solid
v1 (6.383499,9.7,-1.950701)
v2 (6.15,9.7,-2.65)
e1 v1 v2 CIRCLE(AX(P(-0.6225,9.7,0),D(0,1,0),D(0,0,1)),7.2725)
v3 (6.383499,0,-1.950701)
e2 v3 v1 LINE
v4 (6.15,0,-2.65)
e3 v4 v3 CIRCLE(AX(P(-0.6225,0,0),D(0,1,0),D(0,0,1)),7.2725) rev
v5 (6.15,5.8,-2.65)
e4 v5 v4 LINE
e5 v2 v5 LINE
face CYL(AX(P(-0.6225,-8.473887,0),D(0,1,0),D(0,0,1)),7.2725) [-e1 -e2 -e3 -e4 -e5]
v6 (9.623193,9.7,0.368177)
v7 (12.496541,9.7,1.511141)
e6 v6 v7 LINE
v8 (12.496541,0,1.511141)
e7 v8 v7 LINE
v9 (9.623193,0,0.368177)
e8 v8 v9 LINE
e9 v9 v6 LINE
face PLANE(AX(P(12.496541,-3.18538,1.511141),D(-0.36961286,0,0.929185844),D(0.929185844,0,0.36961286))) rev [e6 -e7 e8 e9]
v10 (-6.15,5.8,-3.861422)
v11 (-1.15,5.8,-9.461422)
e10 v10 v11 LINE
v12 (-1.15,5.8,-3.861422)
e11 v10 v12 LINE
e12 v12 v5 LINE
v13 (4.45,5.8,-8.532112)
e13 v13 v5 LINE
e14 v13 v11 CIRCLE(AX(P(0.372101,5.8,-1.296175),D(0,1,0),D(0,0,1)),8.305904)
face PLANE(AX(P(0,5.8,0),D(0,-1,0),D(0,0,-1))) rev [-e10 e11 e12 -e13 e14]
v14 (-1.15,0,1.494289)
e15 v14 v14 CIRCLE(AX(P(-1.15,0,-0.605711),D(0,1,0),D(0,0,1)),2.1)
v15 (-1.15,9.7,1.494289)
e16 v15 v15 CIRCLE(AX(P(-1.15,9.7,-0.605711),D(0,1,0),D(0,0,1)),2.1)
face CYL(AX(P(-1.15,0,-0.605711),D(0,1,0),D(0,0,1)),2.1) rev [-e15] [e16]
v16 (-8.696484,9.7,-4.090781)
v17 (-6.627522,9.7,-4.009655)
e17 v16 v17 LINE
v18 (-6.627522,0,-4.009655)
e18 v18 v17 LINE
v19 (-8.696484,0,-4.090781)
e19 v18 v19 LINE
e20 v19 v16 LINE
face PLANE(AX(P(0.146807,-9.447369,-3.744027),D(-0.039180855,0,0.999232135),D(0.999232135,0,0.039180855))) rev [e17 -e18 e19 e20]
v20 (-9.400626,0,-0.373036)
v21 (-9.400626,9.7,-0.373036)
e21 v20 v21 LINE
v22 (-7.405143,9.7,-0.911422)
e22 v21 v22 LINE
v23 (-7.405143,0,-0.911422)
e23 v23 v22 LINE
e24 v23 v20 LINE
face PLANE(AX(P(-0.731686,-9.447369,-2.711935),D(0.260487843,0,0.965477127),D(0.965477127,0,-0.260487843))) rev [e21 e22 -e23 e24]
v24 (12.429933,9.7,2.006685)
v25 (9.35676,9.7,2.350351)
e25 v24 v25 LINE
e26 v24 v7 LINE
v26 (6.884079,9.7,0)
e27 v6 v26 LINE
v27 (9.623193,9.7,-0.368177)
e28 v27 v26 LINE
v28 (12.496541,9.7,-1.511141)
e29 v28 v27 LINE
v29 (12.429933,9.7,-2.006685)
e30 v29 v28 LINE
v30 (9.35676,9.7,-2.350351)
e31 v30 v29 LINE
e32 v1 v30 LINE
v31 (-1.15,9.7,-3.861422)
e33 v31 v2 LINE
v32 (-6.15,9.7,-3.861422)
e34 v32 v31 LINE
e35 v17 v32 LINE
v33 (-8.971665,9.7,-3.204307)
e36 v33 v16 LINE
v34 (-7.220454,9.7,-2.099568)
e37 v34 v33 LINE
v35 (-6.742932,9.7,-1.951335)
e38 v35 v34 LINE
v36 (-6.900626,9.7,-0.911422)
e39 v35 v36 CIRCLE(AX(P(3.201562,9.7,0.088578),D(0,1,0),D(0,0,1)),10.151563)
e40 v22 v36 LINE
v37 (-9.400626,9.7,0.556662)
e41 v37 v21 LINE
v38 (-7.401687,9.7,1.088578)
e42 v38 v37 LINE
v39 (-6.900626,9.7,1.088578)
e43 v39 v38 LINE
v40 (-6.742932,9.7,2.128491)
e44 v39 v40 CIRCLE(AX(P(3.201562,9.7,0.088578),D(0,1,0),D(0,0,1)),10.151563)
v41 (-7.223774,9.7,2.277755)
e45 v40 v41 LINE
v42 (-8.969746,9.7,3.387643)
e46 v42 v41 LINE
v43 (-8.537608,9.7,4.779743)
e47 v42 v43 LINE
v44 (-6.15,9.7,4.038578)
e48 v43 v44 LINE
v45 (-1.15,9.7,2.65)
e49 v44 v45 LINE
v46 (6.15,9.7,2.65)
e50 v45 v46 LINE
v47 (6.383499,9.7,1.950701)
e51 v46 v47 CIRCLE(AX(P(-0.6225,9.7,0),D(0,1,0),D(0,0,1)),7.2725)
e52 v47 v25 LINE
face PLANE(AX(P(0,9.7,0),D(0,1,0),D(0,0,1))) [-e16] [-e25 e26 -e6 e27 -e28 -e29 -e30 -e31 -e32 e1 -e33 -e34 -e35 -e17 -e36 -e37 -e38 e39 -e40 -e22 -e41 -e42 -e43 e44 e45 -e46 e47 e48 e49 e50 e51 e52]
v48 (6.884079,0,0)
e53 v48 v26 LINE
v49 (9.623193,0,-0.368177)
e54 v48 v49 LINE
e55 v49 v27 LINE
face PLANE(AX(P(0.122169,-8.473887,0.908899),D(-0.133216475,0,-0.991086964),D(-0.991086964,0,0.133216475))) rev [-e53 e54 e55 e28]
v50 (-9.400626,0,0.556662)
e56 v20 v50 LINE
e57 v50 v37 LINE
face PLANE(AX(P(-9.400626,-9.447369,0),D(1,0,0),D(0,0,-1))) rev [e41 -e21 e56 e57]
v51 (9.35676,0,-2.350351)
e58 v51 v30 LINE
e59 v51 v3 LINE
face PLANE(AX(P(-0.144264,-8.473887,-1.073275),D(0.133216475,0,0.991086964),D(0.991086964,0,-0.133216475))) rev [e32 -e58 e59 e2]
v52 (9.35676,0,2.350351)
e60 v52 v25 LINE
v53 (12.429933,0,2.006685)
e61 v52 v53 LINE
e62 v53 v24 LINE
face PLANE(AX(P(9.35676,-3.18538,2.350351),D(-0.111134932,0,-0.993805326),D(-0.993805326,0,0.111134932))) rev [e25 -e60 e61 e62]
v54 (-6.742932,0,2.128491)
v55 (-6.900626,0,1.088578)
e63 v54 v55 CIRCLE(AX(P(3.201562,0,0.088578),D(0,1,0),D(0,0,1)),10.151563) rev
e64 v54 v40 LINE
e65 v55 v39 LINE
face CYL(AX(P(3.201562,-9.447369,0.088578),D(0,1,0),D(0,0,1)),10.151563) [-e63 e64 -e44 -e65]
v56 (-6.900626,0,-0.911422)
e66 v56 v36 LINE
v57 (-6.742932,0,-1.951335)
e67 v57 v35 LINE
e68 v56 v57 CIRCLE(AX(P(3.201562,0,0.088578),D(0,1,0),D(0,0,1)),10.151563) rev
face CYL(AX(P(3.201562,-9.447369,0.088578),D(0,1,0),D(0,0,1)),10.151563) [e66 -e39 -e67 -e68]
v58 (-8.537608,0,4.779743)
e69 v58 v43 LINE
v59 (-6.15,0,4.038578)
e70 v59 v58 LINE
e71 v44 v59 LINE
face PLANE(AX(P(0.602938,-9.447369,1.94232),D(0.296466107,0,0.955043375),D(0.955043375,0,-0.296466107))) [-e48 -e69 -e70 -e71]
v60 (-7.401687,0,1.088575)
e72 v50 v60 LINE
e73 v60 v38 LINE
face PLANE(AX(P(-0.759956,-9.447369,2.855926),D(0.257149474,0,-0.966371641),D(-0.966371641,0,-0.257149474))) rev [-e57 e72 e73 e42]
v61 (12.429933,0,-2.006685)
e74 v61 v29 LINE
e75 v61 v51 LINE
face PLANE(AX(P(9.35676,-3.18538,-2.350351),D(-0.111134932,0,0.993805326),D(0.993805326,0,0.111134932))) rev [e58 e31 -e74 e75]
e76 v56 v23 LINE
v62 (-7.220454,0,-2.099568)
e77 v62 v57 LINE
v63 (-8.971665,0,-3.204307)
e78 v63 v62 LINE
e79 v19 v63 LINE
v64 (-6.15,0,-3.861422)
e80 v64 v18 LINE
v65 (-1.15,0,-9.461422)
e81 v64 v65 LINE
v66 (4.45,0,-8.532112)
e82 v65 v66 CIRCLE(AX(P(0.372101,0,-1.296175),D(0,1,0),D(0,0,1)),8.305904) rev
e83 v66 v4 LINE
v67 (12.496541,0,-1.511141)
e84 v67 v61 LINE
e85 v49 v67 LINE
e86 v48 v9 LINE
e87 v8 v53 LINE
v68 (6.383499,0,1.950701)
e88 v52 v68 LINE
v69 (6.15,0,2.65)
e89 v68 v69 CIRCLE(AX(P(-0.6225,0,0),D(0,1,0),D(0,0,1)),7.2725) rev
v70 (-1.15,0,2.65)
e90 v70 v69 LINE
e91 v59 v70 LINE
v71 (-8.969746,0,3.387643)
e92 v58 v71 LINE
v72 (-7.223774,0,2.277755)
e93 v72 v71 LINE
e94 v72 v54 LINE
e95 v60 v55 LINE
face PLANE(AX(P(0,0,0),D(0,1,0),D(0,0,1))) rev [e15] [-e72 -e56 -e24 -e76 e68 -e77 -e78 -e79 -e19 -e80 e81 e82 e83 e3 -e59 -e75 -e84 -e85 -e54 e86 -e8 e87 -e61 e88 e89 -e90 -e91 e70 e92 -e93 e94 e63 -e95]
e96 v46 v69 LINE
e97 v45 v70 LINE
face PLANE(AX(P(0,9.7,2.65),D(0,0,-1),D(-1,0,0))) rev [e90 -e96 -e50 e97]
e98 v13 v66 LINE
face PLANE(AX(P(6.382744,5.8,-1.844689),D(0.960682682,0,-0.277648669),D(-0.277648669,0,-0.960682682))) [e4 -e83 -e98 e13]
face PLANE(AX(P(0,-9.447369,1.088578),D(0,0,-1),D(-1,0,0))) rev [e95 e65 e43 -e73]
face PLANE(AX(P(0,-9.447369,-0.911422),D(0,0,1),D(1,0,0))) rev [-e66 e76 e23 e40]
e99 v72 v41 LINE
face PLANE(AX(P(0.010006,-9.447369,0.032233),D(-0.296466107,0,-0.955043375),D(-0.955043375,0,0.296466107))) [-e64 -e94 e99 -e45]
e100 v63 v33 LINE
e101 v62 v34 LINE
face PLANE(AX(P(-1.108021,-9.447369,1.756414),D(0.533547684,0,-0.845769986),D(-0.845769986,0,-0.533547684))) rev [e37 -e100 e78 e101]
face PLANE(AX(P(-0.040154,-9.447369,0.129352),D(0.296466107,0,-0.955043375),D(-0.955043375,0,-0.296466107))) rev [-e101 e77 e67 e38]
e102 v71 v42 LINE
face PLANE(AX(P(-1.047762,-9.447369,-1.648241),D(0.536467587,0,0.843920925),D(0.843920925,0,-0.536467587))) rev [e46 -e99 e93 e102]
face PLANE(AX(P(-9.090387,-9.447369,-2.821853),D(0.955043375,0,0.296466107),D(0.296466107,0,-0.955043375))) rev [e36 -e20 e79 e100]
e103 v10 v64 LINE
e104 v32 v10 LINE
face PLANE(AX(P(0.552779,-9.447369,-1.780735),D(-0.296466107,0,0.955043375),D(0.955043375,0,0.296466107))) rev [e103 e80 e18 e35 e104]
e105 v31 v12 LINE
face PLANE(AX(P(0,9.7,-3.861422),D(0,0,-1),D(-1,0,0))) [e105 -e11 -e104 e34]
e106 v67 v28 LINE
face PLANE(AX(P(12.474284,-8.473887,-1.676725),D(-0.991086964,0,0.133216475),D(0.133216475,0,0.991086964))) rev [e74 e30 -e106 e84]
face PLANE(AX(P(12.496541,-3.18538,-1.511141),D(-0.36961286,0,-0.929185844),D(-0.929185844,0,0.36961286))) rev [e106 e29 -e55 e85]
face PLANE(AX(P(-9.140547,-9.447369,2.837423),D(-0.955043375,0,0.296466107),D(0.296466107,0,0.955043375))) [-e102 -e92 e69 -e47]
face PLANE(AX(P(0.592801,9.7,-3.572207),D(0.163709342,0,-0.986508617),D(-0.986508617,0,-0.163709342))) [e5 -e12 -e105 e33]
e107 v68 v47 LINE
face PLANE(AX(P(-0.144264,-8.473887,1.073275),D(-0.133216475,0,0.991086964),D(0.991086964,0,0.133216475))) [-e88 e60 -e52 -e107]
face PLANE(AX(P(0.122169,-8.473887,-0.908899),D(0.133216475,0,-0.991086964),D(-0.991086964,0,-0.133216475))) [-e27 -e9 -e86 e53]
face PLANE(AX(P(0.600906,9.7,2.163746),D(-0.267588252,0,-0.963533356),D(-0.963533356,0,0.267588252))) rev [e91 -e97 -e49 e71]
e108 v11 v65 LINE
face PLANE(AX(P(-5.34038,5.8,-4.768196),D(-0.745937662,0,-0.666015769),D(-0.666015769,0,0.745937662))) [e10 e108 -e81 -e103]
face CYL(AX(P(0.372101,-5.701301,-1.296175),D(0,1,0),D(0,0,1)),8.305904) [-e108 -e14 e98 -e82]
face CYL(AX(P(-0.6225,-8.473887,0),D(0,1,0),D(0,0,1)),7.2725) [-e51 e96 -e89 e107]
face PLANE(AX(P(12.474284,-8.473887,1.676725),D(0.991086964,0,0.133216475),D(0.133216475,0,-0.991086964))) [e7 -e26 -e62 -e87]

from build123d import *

# Parameters (mm, degrees)
BOSS_EXTRUDE1_DEPTH = 9.7
BOSS_EXTRUDE2_DEPTH = 5.8
CUT_EXTRUDE1_DEPTH  = 15.880557968
BOSS_EXTRUDE9_REACH = 16.881
BOSS_EXTRUDE8_START = -9.7
BOSS_EXTRUDE8_DEPTH = 9.7
BOSS_EXTRUDE5_DEPTH = 5.8
CUT_EXTRUDE2_DEPTH  = 9.7


# Read off the part's stored shape, not the designer's step: Boss-Extrude8
with BuildPart() as part:
    # Sketch1 → Boss-Extrude1 (new body)
    with BuildSketch(Plane(origin=(0, 0, 0), x_dir=(1, 0, 0), z_dir=(0, 1, 0))):
        Polygon((6.15, 2.65), (6.15, -2.65), (-1.15, -2.65), (-6.15, -4.038578044), (-6.15, 3.861421956), (-1.15, 3.861421956), align=None)
    extrude(amount=BOSS_EXTRUDE1_DEPTH)

    # Sketch2 → Boss-Extrude2 (add)
    with BuildSketch(Plane.XZ):
        Polygon((-6.15, -3.861421956), (-1.15, -9.461421956), (-1.15, -3.861421956), align=None)
        Polygon((-1.15, -3.861421956), (-1.15, -9.461421956), (4.45, -8.532111962), (4.45, -2.932111962), align=None)
        Polygon((4.45, -2.932111962), (4.45, -8.532111962), (6.15, -2.65), align=None)
    extrude(amount=-BOSS_EXTRUDE2_DEPTH)

    # Sketch3 → Cut-Extrude1 (cut, through all)
    with BuildSketch(Plane(origin=(0, 9.7, 0), x_dir=(1, 0, 0), z_dir=(0, 1, 0))):
        with BuildLine():
            ThreePointArc((0.95, 0.605710978), (0.33492424, 2.090635219), (-1.15, 2.705710978))
            Line((-1.15, 2.705710978), (-1.15, -1.494289022))
            ThreePointArc((-1.15, -1.494289022), (0.33492424, -0.879213262), (0.95, 0.605710978))
        make_face()
        with BuildLine():
            Line((-1.15, -1.494289022), (-1.15, 2.705710978))
            ThreePointArc((-1.15, 2.705710978), (-3.25, 0.605710978), (-1.15, -1.494289022))
        make_face()
    extrude(amount=-CUT_EXTRUDE1_DEPTH, mode=Mode.SUBTRACT)

    # Boss-Extrude9: up to this face of the body (flat: up to its plane)
    boss_extrude9_end = Plane(part.part.faces().sort_by_distance((0.174384558, 0, -2.694350329))[0])
    # Sketch4 → Boss-Extrude9 (add, up to the picked face)
    with BuildSketch(Plane(origin=(0, 9.7, 0), x_dir=(1, 0, 0), z_dir=(0, 1, 0)), mode=Mode.PRIVATE) as boss_extrude9_sk1:
        with BuildLine():
            Line((12.596453684, 0.767826071), (12.330020735, 2.75))
            Line((12.330020735, 2.75), (6.383498949, 1.950701151))
            ThreePointArc((6.383498949, 1.950701151), (6.27561663, 2.303311358), (6.15, 2.65))
            Line((6.15, 2.65), (6.15, -2.65))
            ThreePointArc((6.15, -2.65), (6.27561663, -2.303311358), (6.383498949, -1.950701151))
            Line((6.383498949, -1.950701151), (12.330020735, -2.75))
            Line((12.330020735, -2.75), (12.596453684, -0.767826071))
            Line((12.596453684, -0.767826071), (6.884079059, 0))
            Line((6.884079059, 0), (12.596453684, 0.767826071))
        make_face()
    boss_extrude9_tool1 = split(extrude(boss_extrude9_sk1.sketch, amount=-BOSS_EXTRUDE9_REACH, mode=Mode.PRIVATE), bisect_by=boss_extrude9_end, keep=Keep.BOTH, mode=Mode.PRIVATE)
    add(boss_extrude9_tool1.solids().sort_by(Axis((6.19524, 9.7, -2.276473), (0, -1, 0)))[0])

    # Boss-Extrude8 outline → Boss-Extrude8 (add)
    with BuildSketch(Plane(origin=(0, 9.7, 0), x_dir=(1, 0, 0), z_dir=(0, 1, 0)).offset(BOSS_EXTRUDE8_START)):
        with BuildLine():
            Line((-7.223773577, -2.277754847), (-8.969746456, -3.387643024))
            Line((-8.969746456, -3.387643024), (-8.537608436, -4.779743311))
            Line((-8.537608436, -4.779743311), (-6.15, -4.038578044))
            Line((-6.15, -4.038578044), (-6.15, 3.861421956))
            Line((-6.15, 3.861421956), (-6.627521687, 4.00965501))
            Line((-6.627521687, 4.00965501), (-8.696484144, 4.090781022))
            Line((-8.696484144, 4.090781022), (-8.971664943, 3.204306677))
            Line((-8.971664943, 3.204306677), (-7.220453901, 2.099568261))
            Line((-7.220453901, 2.099568261), (-6.742932214, 1.951335207))
            ThreePointArc((-6.742932214, 1.951335207), (-6.835256527, 1.433422288), (-6.900626431, 0.911421956))
            Line((-6.900626431, 0.911421956), (-7.405143495, 0.911421956))
            Line((-7.405143495, 0.911421956), (-9.400626431, 0.373036291))
            Line((-9.400626431, 0.373036291), (-9.400626431, -0.556661548))
            Line((-9.400626431, -0.556661548), (-7.401686619, -1.088575255))
            Line((-7.401686619, -1.088575255), (-6.900626431, -1.088578044))
            ThreePointArc((-6.900626431, -1.088578044), (-6.835256527, -1.610578376), (-6.742932214, -2.128491295))
            Line((-6.742932214, -2.128491295), (-7.223773577, -2.277754847))
        make_face()
    extrude(amount=BOSS_EXTRUDE8_DEPTH)

    # Sketch8 → Boss-Extrude5 (add)
    with BuildSketch(Plane(origin=(0, 5.8, 0), x_dir=(1, 0, 0), z_dir=(0, 1, 0))):
        with BuildLine():
            ThreePointArc((1.731854671, 9.490021268), (0.289677429, 9.601670434), (-1.15, 9.461421956))
            Line((-1.15, 9.461421956), (1.65, 8.996766959))
            Line((1.65, 8.996766959), (1.731854671, 9.490021268))
        make_face()
        with BuildLine():
            Line((1.731854671, 9.490021268), (1.65, 8.996766959))
            Line((1.65, 8.996766959), (4.45, 8.532111962))
            ThreePointArc((4.45, 8.532111962), (3.132791885, 9.12986067), (1.731854671, 9.490021268))
        make_face()
    extrude(amount=-BOSS_EXTRUDE5_DEPTH)

    # Sketch5 → Cut-Extrude2 (cut)
    with BuildSketch(Plane(origin=(0, 9.7, 0), x_dir=(1, 0, 0), z_dir=(0, 1, 0))):
        Polygon((9.623192791, 0.368176647), (12.596453684, 0.767826071), (12.496541328, 1.511141295), align=None)
        Polygon((9.356759842, 2.350350576), (12.429933091, 2.006684777), (12.330020735, 2.75), align=None)
        Polygon((12.429933091, -2.006684777), (12.330020735, -2.75), (9.356759842, -2.350350576), align=None)
        Polygon((12.596453684, -0.767826071), (12.496541328, -1.511141295), (9.623192791, -0.368176647), align=None)
    extrude(amount=-CUT_EXTRUDE2_DEPTH, mode=Mode.SUBTRACT)


solid = part.part
